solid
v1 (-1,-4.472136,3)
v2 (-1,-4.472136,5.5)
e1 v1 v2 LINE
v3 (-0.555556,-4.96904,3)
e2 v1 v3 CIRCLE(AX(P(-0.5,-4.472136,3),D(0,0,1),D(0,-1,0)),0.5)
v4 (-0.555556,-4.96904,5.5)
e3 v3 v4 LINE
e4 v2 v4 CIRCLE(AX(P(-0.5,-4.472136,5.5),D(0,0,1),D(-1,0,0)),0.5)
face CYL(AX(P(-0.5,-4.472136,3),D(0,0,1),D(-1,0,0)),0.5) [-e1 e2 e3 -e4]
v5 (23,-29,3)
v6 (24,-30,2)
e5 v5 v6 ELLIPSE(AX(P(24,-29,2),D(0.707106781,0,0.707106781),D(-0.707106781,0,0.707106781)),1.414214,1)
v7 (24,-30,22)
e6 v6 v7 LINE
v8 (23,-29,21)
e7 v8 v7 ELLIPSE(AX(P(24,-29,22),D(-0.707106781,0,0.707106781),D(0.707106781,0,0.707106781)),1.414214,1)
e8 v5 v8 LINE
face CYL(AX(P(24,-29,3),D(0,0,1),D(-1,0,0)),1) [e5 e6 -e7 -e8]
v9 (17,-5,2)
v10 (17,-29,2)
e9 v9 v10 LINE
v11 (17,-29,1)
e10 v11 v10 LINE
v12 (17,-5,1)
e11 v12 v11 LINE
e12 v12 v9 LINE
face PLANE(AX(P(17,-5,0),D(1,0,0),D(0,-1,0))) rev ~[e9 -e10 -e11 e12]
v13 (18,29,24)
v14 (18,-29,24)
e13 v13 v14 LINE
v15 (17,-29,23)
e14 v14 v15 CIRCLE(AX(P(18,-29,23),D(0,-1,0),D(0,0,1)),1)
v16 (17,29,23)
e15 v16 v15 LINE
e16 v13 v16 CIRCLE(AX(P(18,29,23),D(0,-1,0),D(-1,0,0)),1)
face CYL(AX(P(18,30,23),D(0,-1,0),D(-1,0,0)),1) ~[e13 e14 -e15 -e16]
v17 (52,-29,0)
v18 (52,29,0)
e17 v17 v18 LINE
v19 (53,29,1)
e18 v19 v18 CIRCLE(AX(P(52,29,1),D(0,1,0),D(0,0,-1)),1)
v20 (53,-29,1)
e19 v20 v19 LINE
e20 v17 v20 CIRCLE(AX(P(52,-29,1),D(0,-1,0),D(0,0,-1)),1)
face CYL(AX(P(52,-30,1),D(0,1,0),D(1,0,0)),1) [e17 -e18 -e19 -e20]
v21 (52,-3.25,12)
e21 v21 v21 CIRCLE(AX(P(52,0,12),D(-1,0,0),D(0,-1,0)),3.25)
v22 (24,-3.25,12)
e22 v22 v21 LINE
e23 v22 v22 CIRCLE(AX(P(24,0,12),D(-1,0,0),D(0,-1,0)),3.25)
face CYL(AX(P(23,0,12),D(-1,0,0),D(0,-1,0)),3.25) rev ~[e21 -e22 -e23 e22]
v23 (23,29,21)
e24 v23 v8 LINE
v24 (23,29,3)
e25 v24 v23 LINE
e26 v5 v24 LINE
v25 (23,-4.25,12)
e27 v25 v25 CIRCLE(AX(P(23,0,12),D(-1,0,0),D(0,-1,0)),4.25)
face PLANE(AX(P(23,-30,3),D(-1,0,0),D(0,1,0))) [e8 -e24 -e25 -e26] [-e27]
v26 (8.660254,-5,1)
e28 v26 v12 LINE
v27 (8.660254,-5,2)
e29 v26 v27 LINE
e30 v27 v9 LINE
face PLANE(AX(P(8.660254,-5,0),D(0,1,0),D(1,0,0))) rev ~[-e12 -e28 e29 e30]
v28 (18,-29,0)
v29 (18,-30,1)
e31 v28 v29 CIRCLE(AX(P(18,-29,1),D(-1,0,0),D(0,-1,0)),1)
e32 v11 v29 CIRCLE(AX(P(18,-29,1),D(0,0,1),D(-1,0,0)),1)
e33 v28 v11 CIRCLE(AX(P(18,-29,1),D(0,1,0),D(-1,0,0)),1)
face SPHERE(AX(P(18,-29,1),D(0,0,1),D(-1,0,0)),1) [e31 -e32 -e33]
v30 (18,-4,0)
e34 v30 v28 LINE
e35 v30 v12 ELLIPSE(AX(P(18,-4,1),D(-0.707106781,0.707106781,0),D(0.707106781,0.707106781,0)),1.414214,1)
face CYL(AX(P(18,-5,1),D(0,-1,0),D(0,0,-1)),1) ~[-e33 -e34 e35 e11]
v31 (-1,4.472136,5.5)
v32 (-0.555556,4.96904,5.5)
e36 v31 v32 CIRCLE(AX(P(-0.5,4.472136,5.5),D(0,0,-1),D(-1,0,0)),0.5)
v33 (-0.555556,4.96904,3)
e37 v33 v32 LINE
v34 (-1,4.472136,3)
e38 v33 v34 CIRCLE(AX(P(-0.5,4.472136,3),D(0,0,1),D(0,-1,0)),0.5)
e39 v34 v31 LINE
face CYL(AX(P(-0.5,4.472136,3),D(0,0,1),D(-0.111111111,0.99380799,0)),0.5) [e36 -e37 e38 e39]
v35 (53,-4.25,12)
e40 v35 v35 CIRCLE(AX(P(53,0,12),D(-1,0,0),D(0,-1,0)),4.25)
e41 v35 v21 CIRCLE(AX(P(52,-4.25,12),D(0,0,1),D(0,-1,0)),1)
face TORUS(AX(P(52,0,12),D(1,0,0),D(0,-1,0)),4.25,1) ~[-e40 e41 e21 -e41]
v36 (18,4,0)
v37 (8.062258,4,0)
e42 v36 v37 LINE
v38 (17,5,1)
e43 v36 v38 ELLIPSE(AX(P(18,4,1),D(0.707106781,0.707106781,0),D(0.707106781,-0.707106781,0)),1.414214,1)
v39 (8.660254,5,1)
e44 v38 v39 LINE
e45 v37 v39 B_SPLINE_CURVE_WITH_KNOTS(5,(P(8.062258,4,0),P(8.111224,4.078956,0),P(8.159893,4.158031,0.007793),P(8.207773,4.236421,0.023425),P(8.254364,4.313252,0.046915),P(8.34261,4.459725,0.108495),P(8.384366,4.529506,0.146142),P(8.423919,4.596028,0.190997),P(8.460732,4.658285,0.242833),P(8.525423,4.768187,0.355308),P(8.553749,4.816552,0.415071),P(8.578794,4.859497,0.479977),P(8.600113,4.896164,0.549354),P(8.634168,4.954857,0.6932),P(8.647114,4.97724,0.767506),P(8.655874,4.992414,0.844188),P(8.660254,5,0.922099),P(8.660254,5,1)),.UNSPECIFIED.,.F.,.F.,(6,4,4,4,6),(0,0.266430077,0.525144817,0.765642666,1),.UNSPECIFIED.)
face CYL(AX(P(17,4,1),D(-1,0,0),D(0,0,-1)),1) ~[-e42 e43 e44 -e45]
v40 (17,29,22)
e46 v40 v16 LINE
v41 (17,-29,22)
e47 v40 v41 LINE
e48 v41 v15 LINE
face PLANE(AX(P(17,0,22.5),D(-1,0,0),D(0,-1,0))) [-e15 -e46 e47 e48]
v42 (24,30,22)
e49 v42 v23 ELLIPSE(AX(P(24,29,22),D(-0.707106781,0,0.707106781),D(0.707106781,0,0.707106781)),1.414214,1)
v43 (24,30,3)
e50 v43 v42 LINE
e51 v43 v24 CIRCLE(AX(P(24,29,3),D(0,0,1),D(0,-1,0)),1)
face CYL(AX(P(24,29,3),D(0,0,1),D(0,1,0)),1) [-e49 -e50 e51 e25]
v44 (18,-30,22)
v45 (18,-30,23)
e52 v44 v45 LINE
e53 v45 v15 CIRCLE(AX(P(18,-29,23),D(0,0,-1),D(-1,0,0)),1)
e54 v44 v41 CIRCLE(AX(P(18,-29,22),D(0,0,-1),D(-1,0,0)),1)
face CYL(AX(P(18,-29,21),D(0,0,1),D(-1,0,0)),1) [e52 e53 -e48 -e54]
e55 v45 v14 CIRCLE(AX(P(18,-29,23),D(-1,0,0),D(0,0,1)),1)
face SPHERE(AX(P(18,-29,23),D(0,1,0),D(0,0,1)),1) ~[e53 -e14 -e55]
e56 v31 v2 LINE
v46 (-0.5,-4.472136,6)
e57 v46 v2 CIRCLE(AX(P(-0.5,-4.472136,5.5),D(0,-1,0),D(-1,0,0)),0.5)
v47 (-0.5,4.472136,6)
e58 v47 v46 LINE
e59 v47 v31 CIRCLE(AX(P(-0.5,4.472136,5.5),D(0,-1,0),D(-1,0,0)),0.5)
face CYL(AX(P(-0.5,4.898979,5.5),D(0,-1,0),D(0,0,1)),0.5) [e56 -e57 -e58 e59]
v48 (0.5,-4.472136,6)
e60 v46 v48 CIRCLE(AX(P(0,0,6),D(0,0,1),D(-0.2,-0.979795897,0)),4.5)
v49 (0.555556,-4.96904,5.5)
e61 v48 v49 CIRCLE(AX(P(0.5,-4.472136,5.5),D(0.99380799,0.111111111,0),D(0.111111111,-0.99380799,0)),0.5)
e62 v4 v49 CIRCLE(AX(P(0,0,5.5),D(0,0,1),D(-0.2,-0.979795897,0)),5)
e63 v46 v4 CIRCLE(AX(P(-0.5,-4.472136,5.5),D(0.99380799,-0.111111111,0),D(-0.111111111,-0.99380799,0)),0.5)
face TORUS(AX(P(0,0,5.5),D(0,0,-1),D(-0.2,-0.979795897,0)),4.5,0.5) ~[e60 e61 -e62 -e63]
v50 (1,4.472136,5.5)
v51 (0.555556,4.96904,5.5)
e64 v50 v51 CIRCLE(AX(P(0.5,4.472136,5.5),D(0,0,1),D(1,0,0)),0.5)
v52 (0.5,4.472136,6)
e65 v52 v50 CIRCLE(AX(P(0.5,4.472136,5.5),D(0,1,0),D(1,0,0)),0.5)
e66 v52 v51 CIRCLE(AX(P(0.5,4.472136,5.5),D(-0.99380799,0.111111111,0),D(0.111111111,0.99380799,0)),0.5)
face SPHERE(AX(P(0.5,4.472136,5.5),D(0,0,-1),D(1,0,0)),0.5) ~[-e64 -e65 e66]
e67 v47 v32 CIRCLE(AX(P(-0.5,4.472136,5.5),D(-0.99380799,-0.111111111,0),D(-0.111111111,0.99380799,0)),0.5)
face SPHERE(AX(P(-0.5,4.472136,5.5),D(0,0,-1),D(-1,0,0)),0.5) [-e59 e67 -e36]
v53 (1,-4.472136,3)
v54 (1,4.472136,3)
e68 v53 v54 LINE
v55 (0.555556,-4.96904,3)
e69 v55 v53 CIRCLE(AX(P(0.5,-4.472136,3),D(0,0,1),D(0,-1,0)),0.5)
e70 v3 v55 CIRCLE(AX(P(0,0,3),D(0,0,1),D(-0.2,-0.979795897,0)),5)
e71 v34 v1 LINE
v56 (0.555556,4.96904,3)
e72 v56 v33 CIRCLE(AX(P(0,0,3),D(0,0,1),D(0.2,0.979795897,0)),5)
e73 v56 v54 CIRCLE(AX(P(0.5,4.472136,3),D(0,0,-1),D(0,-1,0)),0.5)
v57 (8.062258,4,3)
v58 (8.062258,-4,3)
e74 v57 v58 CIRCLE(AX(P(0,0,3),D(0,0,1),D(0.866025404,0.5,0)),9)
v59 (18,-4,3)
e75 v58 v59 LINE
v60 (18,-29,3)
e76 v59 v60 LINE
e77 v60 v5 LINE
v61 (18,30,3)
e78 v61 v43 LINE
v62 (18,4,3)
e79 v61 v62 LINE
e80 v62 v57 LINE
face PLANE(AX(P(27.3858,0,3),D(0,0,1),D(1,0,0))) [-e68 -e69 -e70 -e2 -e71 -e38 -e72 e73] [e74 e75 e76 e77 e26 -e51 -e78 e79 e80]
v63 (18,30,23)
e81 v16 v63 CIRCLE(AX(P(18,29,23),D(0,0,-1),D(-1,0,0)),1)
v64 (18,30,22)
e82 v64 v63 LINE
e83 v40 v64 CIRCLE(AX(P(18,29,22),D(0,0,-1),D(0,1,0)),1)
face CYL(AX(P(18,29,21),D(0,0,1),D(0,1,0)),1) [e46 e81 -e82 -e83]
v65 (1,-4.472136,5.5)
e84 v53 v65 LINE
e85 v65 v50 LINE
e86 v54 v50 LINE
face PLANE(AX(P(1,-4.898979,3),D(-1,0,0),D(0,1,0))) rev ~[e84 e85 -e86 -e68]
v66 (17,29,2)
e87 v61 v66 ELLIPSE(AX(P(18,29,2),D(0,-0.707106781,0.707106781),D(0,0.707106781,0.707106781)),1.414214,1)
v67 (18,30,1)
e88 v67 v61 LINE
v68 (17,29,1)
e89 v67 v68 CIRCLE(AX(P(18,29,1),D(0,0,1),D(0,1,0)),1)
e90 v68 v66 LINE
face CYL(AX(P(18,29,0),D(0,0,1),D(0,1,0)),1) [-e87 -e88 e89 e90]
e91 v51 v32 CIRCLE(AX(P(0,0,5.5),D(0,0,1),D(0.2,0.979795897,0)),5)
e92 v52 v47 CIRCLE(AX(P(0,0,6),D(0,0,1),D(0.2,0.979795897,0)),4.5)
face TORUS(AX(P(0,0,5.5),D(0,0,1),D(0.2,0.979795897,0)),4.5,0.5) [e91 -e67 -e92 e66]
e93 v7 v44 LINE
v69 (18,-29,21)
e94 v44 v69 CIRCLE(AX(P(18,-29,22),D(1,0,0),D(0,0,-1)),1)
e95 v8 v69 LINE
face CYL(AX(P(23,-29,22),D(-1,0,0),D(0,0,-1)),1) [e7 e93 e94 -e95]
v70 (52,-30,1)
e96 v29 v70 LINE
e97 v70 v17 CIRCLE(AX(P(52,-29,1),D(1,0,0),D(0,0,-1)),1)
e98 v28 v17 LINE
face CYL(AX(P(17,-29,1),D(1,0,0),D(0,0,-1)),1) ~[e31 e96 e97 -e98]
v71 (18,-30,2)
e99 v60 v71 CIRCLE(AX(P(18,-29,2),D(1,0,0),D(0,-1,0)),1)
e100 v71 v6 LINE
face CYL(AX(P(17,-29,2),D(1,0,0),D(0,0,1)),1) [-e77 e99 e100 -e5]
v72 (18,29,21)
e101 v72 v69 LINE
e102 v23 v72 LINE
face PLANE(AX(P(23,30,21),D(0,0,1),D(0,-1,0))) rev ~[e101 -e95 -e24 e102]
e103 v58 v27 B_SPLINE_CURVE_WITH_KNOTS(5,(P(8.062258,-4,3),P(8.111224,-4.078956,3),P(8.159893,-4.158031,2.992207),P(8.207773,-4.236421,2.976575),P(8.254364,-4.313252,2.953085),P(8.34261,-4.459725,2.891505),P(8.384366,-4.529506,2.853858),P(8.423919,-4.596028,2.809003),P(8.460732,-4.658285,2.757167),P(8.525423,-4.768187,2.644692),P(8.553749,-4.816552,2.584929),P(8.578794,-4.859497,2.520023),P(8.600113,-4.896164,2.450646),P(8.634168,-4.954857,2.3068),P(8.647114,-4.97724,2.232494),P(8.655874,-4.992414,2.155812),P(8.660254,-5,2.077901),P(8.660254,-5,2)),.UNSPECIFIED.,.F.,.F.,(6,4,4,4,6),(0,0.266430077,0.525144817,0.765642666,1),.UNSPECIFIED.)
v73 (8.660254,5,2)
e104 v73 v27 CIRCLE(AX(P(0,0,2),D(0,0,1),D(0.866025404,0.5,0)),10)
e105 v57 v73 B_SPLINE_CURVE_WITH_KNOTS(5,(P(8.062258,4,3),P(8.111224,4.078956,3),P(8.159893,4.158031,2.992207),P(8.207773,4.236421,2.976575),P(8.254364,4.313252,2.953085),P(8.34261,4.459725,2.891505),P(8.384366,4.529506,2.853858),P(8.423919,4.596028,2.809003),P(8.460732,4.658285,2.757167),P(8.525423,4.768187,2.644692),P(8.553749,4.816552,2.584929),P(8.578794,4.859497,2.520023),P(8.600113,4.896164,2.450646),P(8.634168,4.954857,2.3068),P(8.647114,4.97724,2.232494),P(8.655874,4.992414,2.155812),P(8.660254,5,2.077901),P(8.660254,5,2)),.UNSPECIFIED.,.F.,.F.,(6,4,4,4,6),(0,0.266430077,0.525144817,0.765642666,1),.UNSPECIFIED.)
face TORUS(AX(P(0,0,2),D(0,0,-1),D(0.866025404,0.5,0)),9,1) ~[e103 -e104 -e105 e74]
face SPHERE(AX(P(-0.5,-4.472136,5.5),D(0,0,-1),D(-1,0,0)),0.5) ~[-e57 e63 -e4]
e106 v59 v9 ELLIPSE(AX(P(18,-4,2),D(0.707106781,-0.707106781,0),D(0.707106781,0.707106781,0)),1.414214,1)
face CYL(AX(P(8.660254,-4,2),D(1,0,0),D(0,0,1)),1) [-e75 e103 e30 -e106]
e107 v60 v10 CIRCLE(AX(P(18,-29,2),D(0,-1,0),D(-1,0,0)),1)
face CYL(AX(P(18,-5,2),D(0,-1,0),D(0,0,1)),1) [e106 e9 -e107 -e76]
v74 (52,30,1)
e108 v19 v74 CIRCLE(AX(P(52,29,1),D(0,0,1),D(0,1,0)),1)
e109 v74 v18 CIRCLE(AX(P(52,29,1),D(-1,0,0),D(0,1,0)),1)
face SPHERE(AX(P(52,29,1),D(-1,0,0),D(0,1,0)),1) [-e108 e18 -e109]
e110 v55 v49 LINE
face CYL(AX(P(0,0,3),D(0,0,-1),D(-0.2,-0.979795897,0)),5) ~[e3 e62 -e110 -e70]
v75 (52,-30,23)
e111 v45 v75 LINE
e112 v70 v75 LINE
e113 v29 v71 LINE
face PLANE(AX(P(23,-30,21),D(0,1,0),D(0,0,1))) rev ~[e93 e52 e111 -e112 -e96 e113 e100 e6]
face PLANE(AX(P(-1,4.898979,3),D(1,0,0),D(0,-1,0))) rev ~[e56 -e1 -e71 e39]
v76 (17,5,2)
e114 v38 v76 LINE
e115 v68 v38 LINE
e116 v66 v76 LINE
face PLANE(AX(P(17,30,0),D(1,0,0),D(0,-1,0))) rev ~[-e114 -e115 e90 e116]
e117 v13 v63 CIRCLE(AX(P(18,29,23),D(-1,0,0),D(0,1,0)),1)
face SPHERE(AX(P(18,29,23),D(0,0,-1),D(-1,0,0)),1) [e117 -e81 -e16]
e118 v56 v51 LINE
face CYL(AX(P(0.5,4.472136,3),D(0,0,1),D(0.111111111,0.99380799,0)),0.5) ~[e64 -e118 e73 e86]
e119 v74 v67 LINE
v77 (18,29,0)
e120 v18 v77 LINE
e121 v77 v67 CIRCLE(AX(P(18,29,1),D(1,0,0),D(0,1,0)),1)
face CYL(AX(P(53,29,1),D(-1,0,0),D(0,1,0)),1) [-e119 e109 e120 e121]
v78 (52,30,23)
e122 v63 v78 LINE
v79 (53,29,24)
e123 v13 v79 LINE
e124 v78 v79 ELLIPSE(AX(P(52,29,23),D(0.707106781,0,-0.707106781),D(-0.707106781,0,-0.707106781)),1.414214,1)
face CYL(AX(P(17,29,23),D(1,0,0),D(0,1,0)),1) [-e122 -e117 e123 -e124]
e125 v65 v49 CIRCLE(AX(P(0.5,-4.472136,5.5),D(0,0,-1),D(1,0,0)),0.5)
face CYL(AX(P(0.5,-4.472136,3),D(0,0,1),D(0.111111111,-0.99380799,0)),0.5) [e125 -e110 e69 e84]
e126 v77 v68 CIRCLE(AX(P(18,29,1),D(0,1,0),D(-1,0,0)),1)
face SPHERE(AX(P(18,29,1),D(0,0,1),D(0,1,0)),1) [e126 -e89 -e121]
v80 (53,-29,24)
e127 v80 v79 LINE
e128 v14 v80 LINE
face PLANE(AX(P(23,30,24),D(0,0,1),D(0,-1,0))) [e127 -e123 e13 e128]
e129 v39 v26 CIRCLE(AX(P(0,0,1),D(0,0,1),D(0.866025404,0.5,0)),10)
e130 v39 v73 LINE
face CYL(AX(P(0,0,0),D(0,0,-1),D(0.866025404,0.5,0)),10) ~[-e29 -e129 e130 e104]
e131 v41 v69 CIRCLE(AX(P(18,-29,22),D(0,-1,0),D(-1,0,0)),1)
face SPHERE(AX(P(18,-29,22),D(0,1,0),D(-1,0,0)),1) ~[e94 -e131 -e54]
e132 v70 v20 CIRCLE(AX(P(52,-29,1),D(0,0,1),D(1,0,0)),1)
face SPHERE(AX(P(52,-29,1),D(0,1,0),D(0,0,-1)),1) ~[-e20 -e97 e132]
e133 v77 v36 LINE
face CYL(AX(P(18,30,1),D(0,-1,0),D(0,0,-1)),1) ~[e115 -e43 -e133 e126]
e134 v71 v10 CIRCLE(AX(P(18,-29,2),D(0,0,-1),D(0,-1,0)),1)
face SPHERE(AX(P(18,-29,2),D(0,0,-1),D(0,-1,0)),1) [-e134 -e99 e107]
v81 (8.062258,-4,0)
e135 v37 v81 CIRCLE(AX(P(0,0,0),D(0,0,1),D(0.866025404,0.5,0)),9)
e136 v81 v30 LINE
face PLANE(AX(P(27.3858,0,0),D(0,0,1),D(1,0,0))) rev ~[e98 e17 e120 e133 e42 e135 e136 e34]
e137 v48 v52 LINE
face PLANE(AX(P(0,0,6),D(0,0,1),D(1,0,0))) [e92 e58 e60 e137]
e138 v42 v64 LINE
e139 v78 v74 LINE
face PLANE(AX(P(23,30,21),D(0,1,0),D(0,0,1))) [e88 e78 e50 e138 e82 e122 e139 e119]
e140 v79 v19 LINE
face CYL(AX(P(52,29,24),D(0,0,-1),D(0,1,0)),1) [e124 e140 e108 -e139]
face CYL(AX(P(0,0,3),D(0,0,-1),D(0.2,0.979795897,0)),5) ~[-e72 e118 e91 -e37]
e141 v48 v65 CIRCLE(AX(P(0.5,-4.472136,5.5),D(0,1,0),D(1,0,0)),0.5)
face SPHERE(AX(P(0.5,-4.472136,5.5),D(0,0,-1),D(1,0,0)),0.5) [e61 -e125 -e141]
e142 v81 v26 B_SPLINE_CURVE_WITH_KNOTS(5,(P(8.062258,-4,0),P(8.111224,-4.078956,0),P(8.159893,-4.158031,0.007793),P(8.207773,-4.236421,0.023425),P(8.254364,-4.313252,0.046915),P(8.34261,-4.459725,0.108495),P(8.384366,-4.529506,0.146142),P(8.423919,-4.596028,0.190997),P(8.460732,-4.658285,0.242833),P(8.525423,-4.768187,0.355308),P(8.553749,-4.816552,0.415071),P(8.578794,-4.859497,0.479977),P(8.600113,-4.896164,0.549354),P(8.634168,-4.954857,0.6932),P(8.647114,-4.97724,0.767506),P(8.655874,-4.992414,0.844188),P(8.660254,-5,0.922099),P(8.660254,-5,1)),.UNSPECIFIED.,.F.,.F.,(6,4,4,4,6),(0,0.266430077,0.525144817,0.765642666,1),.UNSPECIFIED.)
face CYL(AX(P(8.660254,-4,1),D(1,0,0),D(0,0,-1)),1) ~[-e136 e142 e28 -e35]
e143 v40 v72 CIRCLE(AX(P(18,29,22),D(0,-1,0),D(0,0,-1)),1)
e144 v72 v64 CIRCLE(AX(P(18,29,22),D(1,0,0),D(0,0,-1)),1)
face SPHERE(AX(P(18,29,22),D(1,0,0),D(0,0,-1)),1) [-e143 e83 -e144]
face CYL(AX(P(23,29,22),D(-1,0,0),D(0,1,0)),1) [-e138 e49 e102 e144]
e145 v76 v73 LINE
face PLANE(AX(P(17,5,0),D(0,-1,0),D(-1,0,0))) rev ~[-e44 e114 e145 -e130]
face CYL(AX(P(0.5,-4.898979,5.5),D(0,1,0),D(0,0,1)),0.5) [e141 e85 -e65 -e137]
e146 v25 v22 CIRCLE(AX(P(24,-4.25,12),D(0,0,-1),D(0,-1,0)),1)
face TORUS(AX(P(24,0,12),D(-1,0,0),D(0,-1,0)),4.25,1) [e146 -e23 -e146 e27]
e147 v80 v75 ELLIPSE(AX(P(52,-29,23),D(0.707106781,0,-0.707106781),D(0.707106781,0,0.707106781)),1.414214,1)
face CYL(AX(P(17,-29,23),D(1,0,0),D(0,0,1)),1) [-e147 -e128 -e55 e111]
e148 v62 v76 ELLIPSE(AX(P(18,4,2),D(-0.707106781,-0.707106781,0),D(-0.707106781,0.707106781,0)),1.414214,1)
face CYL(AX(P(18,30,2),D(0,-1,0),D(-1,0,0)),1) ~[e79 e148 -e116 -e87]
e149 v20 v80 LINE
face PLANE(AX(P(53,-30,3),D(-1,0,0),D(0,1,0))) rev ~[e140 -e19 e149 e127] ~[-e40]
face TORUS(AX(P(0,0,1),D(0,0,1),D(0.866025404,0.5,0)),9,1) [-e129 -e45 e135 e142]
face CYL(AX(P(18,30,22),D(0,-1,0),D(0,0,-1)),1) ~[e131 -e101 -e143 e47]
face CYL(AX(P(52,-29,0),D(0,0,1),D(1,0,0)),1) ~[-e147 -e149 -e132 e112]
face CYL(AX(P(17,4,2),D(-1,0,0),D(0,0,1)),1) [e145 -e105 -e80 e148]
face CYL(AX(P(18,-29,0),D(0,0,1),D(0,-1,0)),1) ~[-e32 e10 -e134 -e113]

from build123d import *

# Parameters (mm, degrees)
F0_R     = 5
F1_DEPTH = 3
F3_DEPTH = 3
F4_W     = 30
F4_H     = 60
F5_DEPTH = 21
F6_W     = 60
F6_H     = 3
F7_DEPTH = 6
F8_R     = 3.25
F9_DEPTH = 30
F10_R    = 1
F11_R    = 0.5


# Not quite as in the source:
# - a feature names something its author has since deleted; it is built from what else it names


with BuildPart() as f1:
    # F0 (on Top) → F1 (new body)
    with BuildSketch(Plane.XY):
        with BuildLine():
            Line((17, 5), (8.6602540378, 5))
            ThreePointArc((8.6602540378, 5), (-10, 0), (8.6602540378, -5))
            Line((8.6602540378, -5), (17, -5))
            Line((17, -5), (17, -30))
            Line((17, -30), (53, -30))
            Line((53, -30), (53, 30))
            Line((53, 30), (17, 30))
            Line((17, 30), (17, 5))
        make_face()
        Circle(F0_R, mode=Mode.SUBTRACT)
        Circle(F0_R)
    extrude(amount=F1_DEPTH)

    # F2 (on face) → F3 (join)
    with BuildSketch(Plane.XY.offset(3)):
        with BuildLine():
            Line((1, -4.8989794856), (1, 4.8989794856))
            ThreePointArc((1, 4.8989794856), (0, 5), (-1, 4.8989794856))
            Line((-1, 4.8989794856), (-1, -4.8989794856))
            ThreePointArc((-1, -4.8989794856), (0, -5), (1, -4.8989794856))
        make_face()
    extrude(amount=F3_DEPTH)

    # F4 (on face) → F5 (join)
    with BuildSketch(Plane.XY.offset(3)):
        with Locations((38, 0)):
            Rectangle(F4_W, F4_H)
    extrude(amount=F5_DEPTH)

    # F6 (on face) → F7 (join)
    with BuildSketch(Plane(origin=(23, 0, 0), x_dir=(0, -1, 0), z_dir=(-1, 0, 0))):
        with Locations((0, 22.5)):
            Rectangle(F6_W, F6_H)
    extrude(amount=F7_DEPTH)

    # F8 (on face) → F9 (cut)
    with BuildSketch(Plane(origin=(23, 0, 0), x_dir=(0, -1, 0), z_dir=(-1, 0, 0))):
        with Locations((0, 12)):
            Circle(F8_R)
    extrude(amount=-F9_DEPTH, mode=Mode.SUBTRACT)

    # F10
    f10_edges = [f1.edges().sort_by_distance(p)[0] for p in [
        (17, -30, 1.5),
        (17, 30, 1.5),
        (23, 3.25, 12),
        (12.830127, -5, 3),
        (-10, 0, 3),
        (12.830127, 5, 3),
        (35, 30, 0),
        (53, 30, 12),
        (17, 17.5, 0),
        (12.830127, 5, 0),
        (-10, 0, 0),
        (12.830127, -5, 0),
        (17, -17.5, 0),
        (53, 0, 0),
        (35, -30, 0),
        (53, -30, 12),
        (53, 3.25, 12),
        (23, -30, 12),
        (23, 30, 12),
        (20, 30, 21),
        (17, 0, 21),
        (17, 30, 22.5),
        (17, 0, 24),
        (35, 30, 24),
        (35, -30, 24),
        (17, -30, 22.5),
        (20, -30, 21),
        (20, -30, 3),
        (17, -17.5, 3),
        (17, 17.5, 3),
    ]]
    fillet(f10_edges, radius=F10_R)

    # F11
    f11_edges = [f1.edges().sort_by_distance(p)[0] for p in [
        (0, -5, 6),
        (0, 5, 6),
        (-1, -4.898979, 4.5),
        (1, -4.898979, 4.5),
        (1, 4.898979, 4.5),
        (-1, 4.898979, 4.5),
        (-1, 0, 6),
        (1, 0, 6),
    ]]
    fillet(f11_edges, radius=F11_R)


solid = f1.part
